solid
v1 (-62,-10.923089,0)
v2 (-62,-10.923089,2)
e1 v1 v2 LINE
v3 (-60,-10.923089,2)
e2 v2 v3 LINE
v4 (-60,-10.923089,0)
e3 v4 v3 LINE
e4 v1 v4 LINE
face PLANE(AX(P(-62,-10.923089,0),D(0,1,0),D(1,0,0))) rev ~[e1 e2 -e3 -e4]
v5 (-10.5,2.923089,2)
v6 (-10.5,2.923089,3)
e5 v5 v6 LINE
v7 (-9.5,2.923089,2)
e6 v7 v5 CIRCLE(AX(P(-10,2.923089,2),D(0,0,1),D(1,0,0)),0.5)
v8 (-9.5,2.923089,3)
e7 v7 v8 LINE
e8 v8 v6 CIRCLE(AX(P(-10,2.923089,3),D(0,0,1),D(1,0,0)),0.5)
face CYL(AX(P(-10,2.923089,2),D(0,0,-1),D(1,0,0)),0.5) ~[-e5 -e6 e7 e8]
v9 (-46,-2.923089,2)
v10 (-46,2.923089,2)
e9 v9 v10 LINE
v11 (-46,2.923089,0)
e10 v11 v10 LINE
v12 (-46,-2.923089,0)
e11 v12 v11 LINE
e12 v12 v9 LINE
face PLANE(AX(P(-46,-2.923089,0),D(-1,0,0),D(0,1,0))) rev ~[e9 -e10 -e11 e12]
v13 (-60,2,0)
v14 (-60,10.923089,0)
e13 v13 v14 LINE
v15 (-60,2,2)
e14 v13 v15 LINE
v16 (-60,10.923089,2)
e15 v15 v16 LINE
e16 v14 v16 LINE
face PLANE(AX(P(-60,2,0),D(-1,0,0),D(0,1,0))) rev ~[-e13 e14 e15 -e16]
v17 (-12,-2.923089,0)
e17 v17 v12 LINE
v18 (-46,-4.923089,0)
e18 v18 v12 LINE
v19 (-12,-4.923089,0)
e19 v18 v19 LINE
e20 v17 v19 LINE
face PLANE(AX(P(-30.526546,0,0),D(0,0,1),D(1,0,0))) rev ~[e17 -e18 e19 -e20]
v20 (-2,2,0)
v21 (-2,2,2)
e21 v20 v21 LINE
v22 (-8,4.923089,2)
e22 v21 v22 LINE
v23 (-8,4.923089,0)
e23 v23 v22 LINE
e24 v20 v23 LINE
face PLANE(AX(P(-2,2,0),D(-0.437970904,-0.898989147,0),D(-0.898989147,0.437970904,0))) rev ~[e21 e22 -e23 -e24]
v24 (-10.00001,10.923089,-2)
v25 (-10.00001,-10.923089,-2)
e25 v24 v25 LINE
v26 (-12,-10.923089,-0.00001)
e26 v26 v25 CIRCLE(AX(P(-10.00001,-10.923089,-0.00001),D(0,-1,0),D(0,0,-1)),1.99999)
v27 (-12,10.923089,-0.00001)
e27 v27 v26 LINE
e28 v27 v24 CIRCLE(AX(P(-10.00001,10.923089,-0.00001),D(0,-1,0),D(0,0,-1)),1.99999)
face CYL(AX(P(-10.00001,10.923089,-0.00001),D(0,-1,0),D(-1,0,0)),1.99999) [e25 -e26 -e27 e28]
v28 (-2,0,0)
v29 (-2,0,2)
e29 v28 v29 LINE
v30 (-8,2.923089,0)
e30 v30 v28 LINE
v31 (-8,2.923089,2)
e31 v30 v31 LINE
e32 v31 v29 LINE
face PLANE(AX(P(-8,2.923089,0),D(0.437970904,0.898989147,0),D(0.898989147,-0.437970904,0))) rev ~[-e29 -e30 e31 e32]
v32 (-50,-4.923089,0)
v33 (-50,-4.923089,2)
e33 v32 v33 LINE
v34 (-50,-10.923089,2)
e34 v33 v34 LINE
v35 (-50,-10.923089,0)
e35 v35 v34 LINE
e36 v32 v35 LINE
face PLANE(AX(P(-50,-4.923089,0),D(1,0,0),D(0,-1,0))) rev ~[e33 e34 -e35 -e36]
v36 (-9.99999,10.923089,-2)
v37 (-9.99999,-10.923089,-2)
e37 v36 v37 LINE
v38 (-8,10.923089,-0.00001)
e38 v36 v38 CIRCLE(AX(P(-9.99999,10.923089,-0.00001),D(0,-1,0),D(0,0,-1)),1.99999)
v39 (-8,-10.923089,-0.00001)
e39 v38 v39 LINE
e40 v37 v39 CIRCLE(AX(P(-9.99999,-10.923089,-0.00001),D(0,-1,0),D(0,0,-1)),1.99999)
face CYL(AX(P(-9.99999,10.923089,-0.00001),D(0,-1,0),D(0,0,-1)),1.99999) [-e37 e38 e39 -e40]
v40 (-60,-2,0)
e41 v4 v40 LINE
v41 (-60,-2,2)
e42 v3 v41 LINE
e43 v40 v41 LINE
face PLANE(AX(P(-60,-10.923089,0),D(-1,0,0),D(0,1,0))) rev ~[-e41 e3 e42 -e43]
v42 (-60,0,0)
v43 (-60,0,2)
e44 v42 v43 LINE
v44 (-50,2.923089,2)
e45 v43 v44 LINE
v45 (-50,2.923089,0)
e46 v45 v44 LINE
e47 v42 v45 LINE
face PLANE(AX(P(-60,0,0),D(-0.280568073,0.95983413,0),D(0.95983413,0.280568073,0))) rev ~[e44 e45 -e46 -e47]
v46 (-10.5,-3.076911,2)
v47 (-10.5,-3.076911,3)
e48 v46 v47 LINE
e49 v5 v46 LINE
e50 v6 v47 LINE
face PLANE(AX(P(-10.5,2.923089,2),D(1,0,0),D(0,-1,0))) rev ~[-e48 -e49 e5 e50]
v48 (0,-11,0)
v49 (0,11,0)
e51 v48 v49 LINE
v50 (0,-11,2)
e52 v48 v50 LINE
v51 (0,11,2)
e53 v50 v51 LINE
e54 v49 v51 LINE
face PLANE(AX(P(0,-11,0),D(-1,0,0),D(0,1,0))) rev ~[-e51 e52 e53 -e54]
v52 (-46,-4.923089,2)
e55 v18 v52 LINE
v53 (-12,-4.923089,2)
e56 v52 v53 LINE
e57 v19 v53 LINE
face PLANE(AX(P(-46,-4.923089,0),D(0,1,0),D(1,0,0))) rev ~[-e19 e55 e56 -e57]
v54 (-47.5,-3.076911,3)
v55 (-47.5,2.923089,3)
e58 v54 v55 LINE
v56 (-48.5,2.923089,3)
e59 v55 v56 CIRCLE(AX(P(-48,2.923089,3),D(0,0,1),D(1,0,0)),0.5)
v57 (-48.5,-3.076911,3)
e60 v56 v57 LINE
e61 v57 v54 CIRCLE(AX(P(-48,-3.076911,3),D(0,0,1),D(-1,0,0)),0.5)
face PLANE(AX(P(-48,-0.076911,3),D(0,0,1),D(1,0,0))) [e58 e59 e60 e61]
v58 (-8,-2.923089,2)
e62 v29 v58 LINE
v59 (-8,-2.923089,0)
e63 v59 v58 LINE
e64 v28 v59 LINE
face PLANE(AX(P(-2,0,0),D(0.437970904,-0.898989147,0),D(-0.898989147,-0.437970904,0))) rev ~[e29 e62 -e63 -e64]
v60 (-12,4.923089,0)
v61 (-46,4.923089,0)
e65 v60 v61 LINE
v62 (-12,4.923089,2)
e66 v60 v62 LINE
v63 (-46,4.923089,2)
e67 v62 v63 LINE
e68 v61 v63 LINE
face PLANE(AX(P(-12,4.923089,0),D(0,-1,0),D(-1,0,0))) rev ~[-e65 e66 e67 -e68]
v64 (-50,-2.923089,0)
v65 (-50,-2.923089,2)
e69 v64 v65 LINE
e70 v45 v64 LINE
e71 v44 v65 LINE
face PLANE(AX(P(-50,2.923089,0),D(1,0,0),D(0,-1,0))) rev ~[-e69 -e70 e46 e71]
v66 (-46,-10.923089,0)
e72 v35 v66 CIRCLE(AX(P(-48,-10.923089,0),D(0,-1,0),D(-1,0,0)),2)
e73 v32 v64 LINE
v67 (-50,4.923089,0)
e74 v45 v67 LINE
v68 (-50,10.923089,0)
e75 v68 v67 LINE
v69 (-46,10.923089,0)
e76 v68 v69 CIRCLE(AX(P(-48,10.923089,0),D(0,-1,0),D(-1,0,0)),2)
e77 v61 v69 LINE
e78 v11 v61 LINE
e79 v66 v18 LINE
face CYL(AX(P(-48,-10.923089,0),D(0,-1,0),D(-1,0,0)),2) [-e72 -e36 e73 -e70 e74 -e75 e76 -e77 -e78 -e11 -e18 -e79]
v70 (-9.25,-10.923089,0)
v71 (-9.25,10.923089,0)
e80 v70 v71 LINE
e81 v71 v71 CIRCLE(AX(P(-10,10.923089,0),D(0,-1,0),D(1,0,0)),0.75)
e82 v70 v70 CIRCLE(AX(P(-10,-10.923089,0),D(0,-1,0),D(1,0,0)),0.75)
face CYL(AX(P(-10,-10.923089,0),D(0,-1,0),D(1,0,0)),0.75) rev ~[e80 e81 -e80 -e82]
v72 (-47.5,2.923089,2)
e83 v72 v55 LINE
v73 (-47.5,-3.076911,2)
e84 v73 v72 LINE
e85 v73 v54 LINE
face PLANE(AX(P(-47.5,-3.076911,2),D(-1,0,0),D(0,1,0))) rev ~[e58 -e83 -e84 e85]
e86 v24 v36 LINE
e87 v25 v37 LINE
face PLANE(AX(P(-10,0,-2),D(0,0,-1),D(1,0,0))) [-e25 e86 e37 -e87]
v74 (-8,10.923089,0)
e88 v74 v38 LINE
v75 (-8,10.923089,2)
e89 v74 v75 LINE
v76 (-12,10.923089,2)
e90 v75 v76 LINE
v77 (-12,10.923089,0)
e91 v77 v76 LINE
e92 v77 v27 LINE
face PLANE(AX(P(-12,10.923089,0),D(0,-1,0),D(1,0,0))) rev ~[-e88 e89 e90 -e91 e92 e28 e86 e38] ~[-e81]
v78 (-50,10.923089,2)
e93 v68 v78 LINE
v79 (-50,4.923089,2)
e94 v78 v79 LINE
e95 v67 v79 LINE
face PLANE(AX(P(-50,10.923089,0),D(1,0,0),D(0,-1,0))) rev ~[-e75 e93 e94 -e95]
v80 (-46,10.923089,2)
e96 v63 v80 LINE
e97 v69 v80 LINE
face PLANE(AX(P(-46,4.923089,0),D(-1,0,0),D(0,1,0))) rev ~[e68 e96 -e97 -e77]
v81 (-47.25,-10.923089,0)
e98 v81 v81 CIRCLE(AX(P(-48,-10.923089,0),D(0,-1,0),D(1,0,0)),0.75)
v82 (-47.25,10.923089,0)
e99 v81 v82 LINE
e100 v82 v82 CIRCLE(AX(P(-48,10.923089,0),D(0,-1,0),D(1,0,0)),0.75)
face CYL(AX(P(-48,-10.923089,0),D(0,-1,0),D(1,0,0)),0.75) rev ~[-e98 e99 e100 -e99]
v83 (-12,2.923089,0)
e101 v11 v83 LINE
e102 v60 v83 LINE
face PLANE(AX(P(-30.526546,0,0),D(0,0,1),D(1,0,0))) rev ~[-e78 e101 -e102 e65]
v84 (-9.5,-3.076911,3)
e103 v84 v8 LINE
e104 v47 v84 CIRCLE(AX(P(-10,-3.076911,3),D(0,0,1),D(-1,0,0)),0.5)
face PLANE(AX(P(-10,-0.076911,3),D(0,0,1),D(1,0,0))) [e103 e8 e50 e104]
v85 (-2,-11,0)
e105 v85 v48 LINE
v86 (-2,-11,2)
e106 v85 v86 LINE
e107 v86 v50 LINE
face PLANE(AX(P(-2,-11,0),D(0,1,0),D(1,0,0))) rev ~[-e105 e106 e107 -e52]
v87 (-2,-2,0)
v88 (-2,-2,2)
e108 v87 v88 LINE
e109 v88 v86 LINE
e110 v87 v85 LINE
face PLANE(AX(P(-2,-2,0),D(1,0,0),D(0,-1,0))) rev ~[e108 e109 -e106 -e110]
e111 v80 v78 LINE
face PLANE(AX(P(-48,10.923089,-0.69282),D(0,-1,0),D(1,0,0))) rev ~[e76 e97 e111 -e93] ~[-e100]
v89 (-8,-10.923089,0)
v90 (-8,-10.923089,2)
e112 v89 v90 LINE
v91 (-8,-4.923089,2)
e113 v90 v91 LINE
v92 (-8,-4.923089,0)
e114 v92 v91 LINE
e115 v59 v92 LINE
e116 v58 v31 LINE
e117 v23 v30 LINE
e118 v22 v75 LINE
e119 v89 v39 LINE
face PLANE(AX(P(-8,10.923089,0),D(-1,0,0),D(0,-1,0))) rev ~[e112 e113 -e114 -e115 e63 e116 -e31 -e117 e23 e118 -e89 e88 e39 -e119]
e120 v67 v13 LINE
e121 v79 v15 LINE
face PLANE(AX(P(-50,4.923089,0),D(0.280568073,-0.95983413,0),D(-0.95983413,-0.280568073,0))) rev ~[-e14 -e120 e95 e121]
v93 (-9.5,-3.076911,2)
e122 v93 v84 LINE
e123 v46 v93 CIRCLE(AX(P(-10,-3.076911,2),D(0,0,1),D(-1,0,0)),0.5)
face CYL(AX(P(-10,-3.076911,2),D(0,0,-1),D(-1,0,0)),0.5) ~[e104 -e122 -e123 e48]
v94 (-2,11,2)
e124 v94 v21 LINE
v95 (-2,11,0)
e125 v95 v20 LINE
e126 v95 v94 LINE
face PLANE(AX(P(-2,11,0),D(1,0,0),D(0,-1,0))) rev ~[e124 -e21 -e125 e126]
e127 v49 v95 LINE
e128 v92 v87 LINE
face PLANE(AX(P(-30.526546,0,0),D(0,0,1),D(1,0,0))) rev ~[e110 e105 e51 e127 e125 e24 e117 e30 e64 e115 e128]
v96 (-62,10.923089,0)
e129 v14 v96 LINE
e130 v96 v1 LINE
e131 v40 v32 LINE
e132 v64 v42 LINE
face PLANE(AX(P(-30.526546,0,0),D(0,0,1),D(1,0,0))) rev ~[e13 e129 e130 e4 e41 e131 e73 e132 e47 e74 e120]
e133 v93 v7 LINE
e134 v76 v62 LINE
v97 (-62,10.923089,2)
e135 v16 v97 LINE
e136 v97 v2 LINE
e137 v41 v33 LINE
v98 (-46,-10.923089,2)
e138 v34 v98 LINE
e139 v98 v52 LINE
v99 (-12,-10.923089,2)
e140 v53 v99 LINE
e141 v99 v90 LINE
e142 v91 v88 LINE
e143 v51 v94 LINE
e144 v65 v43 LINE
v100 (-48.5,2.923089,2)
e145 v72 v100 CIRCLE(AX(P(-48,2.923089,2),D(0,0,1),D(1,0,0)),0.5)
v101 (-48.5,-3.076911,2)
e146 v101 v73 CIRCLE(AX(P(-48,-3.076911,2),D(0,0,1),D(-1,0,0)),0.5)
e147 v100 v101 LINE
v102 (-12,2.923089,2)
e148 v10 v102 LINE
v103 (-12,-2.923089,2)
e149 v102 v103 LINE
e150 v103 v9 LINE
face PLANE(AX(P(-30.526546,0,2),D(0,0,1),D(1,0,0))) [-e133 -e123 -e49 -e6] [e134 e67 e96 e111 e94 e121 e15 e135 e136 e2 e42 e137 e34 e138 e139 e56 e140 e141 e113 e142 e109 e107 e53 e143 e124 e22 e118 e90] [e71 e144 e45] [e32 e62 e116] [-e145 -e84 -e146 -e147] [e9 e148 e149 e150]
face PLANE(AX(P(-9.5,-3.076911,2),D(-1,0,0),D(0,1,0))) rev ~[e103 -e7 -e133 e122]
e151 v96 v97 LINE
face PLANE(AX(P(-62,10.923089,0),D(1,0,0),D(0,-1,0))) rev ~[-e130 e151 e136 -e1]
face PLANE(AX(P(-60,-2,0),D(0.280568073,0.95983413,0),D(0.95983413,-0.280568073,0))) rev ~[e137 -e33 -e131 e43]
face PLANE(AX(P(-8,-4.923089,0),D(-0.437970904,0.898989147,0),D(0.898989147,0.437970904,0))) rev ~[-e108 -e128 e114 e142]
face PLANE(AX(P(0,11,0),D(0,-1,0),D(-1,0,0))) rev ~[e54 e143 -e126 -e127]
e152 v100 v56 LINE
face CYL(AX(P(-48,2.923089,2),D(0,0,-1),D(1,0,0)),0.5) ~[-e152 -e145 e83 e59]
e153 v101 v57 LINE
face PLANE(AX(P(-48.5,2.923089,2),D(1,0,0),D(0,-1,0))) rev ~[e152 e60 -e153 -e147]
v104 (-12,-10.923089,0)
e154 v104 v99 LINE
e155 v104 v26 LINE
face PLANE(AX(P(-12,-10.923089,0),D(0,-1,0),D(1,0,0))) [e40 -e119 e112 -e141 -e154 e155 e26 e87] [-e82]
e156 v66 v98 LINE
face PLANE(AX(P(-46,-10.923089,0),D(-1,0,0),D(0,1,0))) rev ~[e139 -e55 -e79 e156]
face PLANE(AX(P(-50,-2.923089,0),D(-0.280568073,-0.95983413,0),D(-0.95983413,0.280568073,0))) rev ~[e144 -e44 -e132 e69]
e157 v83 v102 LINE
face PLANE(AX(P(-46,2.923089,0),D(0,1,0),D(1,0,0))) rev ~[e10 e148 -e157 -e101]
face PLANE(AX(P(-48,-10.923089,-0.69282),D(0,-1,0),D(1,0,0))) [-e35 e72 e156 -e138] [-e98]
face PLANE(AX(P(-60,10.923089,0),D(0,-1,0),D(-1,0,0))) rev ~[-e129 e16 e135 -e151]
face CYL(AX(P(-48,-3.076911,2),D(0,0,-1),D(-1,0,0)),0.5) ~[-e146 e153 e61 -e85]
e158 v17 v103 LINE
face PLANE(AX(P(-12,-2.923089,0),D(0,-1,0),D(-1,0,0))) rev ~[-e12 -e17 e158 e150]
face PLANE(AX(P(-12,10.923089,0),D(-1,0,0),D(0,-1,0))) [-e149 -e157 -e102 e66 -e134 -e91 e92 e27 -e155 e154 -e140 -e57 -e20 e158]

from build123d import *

# Parameters (mm, degrees)
F1_DEPTH  = 2
F3_DEPTH  = 1
F5_DEPTH  = 21.8461783077
F6_W      = 4
F6_H      = 21.8461783077
F7_DEPTH  = 2
F8_R      = 1.99999
F10_R     = 0.75
F9_R      = 0.75
F11_DEPTH = 21.9240891538


# Not quite as in the source:
# - a fillet or chamfer is up to 0.001 mm smaller than in the source, because OpenCascade refuses the exact size


with BuildPart() as f1:
    # F0 (on Top) → F1 (new body)
    with BuildSketch(Plane.XY):
        Polygon((0, -11), (0, 0), (0, 11), (-2, 11), (-2, 2), (-8, 4.9230891538), (-8, 10.9230891538), (-12, 10.9230891538), (-12, 4.9230891538), (-29, 4.9230891538), (-46, 4.9230891538), (-46, 10.9230891538), (-50, 10.9230891538), (-50, 4.9230891538), (-60, 2), (-60, 10.9230891538), (-62, 10.9230891538), (-62, -10.9230891538), (-60, -10.9230891538), (-60, -2), (-50, -4.9230891538), (-50, -10.9230891538), (-46, -10.9230891538), (-46, -4.9230891538), (-29, -4.9230891538), (-12, -4.9230891538), (-12, -10.9230891538), (-8, -10.9230891538), (-8, -4.9230891538), (-2, -2), (-2, -11), align=None)
        Polygon((-60, 0), (-50, 2.9230891538), (-50, -2.9230891538), align=None, mode=Mode.SUBTRACT)
        Polygon((-12, 2.9230891538), (-12, 0), (-12, -2.9230891538), (-29, -2.9230891538), (-46, -2.9230891538), (-46, 0), (-46, 2.9230891538), (-29, 2.9230891538), align=None, mode=Mode.SUBTRACT)
        Polygon((-8, 2.9230891538), (-2, 0), (-8, -2.9230891538), (-8, 0), align=None, mode=Mode.SUBTRACT)
    extrude(amount=F1_DEPTH)

    # F2 (on face) → F3 (join)
    with BuildSketch(Plane.XY.offset(2)):
        with BuildLine():
            Line((-47.5, -3.0769108462), (-47.5, 2.9230891538))
            ThreePointArc((-47.5, 2.9230891538), (-48, 3.4230891538), (-48.5, 2.9230891538))
            Line((-48.5, 2.9230891538), (-48.5, -3.0769108462))
            ThreePointArc((-48.5, -3.0769108462), (-48, -3.5769108462), (-47.5, -3.0769108462))
        make_face()
        with BuildLine():
            Line((-9.5, -3.0769108462), (-9.5, 2.9230891538))
            ThreePointArc((-9.5, 2.9230891538), (-10, 3.4230891538), (-10.5, 2.9230891538))
            Line((-10.5, 2.9230891538), (-10.5, -3.0769108462))
            ThreePointArc((-10.5, -3.0769108462), (-10, -3.5769108462), (-9.5, -3.0769108462))
        make_face()
    extrude(amount=F3_DEPTH)

    # F4 (on face) → F5 (join, through all)
    with BuildSketch(Plane.XZ.offset(10.9230891538)):
        with BuildLine():
            Line((-46, 0), (-50, 0))
            ThreePointArc((-50, 0), (-48, -2), (-46, 0))
        make_face()
    extrude(amount=-F5_DEPTH)

    # F6 (on face) → F7 (join)
    with BuildSketch(Plane(origin=(0, 0, 0), x_dir=(1, 0, 0), z_dir=(0, 0, -1))):
        with Locations((-10, 0)):
            Rectangle(F6_W, F6_H)
    extrude(amount=F7_DEPTH)

    # F8 (radius 2 in the source; OpenCascade refuses exactly that, so slightly less here)
    f8_edges = [f1.edges().sort_by_distance(p)[0] for p in [
        (-12, 0, -2),
        (-8, 0, -2),
    ]]
    fillet(f8_edges, radius=F8_R)

    # F10 (on face) + F9 (on face) → F11 (cut, through all)
    with BuildSketch(Plane.XZ.offset(10.9230891538)):
        with Locations((-10, 0)):
            Circle(F10_R)
    with BuildSketch(Plane.XZ.offset(10.9230891538)):
        with Locations((-48, 0)):
            Circle(F9_R)
    extrude(amount=-F11_DEPTH, mode=Mode.SUBTRACT)


solid = f1.part
